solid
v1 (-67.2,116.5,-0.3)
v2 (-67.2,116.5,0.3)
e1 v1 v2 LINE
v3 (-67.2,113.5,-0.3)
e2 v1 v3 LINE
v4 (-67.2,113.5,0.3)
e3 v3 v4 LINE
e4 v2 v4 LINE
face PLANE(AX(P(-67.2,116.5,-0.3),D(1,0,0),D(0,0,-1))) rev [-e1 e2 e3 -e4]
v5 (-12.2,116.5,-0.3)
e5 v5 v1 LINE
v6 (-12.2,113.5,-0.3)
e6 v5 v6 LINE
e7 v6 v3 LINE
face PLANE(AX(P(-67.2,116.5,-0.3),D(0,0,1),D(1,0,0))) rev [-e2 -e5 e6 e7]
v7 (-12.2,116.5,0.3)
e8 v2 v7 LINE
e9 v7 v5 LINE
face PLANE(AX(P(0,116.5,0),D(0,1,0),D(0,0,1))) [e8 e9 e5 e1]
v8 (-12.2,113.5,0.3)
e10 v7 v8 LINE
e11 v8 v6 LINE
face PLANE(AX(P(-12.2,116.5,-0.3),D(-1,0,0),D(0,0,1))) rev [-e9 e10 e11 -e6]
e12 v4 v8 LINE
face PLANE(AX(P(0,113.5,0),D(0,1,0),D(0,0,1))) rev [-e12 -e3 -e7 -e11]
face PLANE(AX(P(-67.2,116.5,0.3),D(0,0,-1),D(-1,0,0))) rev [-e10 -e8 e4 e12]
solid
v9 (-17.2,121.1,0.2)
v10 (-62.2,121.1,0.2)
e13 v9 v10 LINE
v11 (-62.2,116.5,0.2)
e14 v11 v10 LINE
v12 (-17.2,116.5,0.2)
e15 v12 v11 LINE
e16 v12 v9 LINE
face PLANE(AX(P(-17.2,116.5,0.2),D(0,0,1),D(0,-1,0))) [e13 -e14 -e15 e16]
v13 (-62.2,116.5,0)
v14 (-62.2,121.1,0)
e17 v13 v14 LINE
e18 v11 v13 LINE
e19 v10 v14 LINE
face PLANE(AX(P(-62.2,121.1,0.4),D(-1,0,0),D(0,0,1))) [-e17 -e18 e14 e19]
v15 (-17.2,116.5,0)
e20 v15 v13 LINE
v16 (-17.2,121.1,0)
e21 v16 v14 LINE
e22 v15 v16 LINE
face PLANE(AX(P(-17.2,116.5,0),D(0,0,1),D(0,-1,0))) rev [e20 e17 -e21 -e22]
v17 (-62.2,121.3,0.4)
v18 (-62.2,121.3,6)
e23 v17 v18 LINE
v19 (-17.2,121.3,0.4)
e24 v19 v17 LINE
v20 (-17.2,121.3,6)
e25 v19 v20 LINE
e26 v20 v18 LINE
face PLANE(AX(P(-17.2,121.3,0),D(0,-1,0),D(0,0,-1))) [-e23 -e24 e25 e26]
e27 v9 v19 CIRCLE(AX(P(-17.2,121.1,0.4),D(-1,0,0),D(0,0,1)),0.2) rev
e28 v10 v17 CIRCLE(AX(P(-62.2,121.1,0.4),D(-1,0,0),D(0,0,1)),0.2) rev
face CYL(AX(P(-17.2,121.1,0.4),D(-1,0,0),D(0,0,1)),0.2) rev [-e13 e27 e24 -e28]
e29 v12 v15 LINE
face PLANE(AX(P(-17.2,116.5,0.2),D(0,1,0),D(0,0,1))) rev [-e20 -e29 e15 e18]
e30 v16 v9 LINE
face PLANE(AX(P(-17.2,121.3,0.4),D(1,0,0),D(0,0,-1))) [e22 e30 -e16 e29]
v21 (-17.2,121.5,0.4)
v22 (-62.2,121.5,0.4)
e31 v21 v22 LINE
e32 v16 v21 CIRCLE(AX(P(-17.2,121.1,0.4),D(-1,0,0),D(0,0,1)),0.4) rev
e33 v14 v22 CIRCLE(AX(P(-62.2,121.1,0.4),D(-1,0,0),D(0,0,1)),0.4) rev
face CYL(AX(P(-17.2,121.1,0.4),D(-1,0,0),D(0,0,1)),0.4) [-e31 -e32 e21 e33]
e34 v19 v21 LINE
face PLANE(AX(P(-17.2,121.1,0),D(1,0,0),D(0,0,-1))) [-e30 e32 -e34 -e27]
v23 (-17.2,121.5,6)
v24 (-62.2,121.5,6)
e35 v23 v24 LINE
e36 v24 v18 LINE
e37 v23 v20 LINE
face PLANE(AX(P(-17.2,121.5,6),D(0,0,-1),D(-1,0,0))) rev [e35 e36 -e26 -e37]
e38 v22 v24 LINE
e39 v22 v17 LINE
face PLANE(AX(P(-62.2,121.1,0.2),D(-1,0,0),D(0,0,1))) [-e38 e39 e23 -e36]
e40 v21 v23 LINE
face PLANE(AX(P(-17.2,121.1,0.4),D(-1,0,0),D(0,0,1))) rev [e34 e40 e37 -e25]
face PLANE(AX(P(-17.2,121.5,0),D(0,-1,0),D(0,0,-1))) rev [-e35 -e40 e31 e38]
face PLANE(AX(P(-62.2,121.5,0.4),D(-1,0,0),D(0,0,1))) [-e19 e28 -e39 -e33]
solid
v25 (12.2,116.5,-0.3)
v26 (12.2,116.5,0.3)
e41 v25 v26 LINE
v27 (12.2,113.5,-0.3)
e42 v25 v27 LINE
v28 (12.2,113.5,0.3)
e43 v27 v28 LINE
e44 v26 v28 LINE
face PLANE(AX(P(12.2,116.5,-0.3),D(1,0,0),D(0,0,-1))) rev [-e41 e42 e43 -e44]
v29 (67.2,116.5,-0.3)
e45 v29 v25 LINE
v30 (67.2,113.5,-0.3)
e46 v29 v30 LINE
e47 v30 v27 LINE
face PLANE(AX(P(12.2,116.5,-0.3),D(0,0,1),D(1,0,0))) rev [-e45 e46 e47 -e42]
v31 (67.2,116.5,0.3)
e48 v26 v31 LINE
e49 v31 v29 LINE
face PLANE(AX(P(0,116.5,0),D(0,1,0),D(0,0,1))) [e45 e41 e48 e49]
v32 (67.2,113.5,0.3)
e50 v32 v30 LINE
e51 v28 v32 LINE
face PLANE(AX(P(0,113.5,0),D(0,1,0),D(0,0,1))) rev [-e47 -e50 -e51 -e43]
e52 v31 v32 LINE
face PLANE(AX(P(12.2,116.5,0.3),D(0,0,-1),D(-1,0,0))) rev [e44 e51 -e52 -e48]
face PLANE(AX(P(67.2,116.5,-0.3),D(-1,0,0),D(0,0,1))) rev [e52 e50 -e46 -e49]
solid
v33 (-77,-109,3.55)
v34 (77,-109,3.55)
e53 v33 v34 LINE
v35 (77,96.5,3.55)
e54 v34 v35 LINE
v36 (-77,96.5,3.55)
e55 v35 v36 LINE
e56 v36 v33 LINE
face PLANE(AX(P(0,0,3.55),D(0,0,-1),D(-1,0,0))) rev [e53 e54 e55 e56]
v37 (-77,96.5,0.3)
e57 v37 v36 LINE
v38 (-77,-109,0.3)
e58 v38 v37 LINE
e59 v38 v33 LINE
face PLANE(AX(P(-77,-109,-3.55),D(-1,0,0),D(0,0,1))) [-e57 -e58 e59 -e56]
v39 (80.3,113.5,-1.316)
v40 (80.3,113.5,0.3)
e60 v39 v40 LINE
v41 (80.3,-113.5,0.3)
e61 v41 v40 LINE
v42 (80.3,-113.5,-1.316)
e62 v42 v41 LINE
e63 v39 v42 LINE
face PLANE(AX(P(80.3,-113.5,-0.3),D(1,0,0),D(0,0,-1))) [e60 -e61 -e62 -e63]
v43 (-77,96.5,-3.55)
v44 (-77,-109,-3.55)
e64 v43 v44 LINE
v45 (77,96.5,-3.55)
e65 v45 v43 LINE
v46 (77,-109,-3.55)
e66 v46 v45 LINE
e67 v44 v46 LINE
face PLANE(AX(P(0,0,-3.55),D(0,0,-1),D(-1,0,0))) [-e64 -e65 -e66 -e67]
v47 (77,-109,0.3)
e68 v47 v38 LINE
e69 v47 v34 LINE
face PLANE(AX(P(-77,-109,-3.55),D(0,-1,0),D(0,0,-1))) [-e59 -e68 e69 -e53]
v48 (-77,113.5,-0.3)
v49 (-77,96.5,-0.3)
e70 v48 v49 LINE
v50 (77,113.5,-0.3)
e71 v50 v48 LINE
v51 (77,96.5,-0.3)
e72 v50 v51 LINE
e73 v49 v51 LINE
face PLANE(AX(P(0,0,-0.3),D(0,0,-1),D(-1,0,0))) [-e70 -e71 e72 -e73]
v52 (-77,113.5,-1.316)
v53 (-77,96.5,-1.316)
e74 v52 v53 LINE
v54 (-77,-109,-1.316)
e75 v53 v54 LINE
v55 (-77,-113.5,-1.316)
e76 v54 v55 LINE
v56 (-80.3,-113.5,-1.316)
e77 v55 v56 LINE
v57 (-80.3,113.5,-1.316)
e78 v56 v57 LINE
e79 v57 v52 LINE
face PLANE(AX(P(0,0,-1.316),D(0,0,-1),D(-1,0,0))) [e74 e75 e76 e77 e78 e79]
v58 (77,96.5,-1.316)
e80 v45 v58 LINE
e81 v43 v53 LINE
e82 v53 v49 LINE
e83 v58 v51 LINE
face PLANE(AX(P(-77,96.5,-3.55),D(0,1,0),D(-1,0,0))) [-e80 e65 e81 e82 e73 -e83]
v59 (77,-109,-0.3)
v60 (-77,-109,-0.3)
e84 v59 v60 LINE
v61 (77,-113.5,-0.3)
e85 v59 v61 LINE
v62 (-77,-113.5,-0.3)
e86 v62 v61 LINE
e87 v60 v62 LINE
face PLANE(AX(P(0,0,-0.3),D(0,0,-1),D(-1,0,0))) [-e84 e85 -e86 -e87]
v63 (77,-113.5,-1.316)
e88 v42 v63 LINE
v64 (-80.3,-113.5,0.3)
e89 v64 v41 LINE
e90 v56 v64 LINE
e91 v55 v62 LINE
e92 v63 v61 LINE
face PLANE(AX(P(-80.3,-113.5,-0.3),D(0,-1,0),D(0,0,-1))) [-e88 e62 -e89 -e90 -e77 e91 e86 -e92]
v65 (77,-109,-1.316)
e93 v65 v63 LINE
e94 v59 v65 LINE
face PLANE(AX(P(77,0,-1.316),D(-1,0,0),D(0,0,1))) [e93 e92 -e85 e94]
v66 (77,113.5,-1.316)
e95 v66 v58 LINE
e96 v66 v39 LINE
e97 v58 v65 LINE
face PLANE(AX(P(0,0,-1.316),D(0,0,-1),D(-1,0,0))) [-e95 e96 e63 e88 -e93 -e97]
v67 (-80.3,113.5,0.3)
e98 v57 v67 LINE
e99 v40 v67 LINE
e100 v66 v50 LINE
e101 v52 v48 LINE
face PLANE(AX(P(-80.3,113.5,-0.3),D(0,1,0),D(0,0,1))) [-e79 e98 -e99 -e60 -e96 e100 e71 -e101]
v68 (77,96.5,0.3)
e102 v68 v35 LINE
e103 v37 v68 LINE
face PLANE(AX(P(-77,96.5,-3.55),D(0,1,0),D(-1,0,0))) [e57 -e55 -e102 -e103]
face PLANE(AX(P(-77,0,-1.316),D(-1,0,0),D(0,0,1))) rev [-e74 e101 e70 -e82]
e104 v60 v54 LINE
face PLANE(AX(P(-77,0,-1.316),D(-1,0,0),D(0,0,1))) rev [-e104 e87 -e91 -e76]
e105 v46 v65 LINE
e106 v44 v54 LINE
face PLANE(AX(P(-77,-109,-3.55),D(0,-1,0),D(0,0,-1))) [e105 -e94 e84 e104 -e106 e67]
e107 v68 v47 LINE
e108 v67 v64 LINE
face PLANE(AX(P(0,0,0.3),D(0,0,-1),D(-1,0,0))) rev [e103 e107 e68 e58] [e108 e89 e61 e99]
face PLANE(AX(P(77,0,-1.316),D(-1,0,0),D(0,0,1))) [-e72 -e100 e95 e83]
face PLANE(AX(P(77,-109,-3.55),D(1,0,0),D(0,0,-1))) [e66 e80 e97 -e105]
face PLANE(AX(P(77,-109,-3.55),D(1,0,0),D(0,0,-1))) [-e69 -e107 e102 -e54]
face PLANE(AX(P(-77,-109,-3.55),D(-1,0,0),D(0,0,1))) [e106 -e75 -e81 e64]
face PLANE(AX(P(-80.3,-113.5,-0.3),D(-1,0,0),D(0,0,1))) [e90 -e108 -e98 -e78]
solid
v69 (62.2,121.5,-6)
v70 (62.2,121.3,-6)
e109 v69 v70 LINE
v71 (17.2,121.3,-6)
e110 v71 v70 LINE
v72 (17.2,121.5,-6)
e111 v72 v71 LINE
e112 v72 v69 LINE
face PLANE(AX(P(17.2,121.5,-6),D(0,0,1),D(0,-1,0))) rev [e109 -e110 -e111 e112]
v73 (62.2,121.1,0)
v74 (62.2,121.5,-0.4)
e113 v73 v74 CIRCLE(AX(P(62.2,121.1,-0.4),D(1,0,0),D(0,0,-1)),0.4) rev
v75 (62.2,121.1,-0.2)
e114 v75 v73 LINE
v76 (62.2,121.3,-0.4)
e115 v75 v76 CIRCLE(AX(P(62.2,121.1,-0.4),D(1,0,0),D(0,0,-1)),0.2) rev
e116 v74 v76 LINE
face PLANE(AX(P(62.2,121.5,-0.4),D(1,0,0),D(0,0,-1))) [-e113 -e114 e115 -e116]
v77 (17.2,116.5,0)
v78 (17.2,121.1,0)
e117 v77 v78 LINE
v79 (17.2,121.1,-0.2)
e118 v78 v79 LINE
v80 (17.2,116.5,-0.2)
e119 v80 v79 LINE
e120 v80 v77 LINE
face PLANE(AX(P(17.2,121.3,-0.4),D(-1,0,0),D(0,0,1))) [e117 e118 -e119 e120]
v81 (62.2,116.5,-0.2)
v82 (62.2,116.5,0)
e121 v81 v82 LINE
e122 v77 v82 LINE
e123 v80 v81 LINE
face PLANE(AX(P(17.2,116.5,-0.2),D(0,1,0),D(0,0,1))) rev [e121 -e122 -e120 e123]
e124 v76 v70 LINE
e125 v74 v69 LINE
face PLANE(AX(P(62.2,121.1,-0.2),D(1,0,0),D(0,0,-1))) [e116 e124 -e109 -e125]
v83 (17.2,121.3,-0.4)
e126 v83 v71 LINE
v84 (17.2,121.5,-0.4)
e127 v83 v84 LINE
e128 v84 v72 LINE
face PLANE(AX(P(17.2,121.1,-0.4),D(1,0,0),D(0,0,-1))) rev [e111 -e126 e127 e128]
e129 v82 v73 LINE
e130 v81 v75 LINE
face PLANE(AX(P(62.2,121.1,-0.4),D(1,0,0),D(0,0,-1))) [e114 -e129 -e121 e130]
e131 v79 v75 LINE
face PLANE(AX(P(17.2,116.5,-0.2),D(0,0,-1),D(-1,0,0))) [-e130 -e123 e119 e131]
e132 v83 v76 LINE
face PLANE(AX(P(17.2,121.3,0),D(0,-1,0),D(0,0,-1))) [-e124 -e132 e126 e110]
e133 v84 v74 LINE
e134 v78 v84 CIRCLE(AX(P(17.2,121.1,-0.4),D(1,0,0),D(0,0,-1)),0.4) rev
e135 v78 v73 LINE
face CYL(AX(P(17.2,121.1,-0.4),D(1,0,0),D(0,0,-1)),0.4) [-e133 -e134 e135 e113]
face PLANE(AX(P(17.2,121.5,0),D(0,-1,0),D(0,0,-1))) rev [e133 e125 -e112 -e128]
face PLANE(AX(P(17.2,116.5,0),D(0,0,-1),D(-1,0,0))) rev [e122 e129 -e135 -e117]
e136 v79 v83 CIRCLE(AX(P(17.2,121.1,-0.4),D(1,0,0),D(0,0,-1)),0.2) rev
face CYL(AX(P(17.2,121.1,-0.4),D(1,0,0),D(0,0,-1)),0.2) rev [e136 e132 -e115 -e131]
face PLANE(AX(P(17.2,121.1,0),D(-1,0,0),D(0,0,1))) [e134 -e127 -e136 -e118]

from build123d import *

# Parameters (mm, degrees)
INSULATION_DEPTH      = 0.3
INSULATION_DEPTH_BACK = 0.3
SKETCH1_W             = 160.6
SKETCH1_H             = 227
MAIN_BODY_DEPTH       = 3.55
MAIN_BODY_DEPTH_BACK  = 3.55
SKETCH2_W             = 154
SKETCH2_H             = 205.5
SIDE_FOLDS_DEPTH      = 1.016
SKETCH114_W           = 55
SKETCH114_H           = 0.6
BOSS_EXTRUDE1_DEPTH   = 3
BOSS_EXTRUDE1_2_DEPTH = 3
BASE_FLANGE1_DEPTH    = 45
BASE_FLANGE2_DEPTH    = 45


# Sheet-metal steps are written as plain solids
with BuildPart() as part:
    # Sketch1 → Insulation (new, two sides: drawn at the far end of the back side and taken through both)
    with BuildSketch(Plane.XY.offset(-INSULATION_DEPTH_BACK)):
        Rectangle(SKETCH1_W, SKETCH1_H)
    extrude(amount=INSULATION_DEPTH + INSULATION_DEPTH_BACK)

    # Sketch2 → Main Body (add, two sides: drawn at the far end of the back side and taken through both)
    with BuildSketch(Plane.XY.offset(-MAIN_BODY_DEPTH_BACK)):
        with Locations((0, -6.25)):
            Rectangle(SKETCH2_W, SKETCH2_H)
    extrude(amount=MAIN_BODY_DEPTH + MAIN_BODY_DEPTH_BACK)

    # Sketch5 → Side Folds (add)
    with BuildSketch(Plane(origin=(0, 0, -0.3), x_dir=(-1, 0, 0), z_dir=(0, 0, -1))):
        Polygon((-77, -109), (-77, 96.5), (-77, 113.5), (-80.3, 113.5), (-80.3, -113.5), (-77, -113.5), align=None)
        Polygon((77, 113.5), (77, 96.5), (77, -109), (77, -113.5), (80.3, -113.5), (80.3, 113.5), align=None)
    extrude(amount=SIDE_FOLDS_DEPTH)


with BuildPart() as body_2:
    # Sketch114 → Boss-Extrude1 (new body)
    with BuildSketch(Plane(origin=(0, 113.5, 0), x_dir=(1, 0, 0), z_dir=(0, 1, 0))):
        with Locations((-39.7, 0)):
            Rectangle(SKETCH114_W, SKETCH114_H)
    extrude(amount=BOSS_EXTRUDE1_DEPTH)


with BuildPart() as body_3:
    # Sketch114 → Boss-Extrude1 2 (new body)
    with BuildSketch(Plane(origin=(0, 113.5, 0), x_dir=(1, 0, 0), z_dir=(0, 1, 0))):
        with Locations((39.7, 0)):
            Rectangle(SKETCH114_W, SKETCH114_H)
    extrude(amount=BOSS_EXTRUDE1_2_DEPTH)


with BuildPart() as body_4:
    # Sketch115 → Base-Flange1 (new body)
    with BuildSketch(Plane.ZY.offset(62.2)):
        with BuildLine():
            Line((0, 116.5), (0, 121.1))
            ThreePointArc((0, 121.1), (0.117157288, 121.382842712), (0.4, 121.5))
            Line((0.4, 121.5), (6, 121.5))
            Line((6, 121.5), (6, 121.3))
            Line((6, 121.3), (0.4, 121.3))
            ThreePointArc((0.4, 121.3), (0.258578644, 121.241421356), (0.2, 121.1))
            Line((0.2, 121.1), (0.2, 116.5))
            Line((0.2, 116.5), (0, 116.5))
        make_face()
    extrude(amount=-BASE_FLANGE1_DEPTH)


with BuildPart() as body_5:
    # Sketch120 → Base-Flange2 (new body)
    with BuildSketch(Plane(origin=(62.2, 0, 0), x_dir=(0, 0, -1), z_dir=(1, 0, 0))):
        with BuildLine():
            Line((0, 116.5), (0, 121.1))
            ThreePointArc((0, 121.1), (0.117157288, 121.382842712), (0.4, 121.5))
            Line((0.4, 121.5), (6, 121.5))
            Line((6, 121.5), (6, 121.3))
            Line((6, 121.3), (0.4, 121.3))
            ThreePointArc((0.4, 121.3), (0.258578644, 121.241421356), (0.2, 121.1))
            Line((0.2, 121.1), (0.2, 116.5))
            Line((0.2, 116.5), (0, 116.5))
        make_face()
    extrude(amount=-BASE_FLANGE2_DEPTH)


solid = Compound([part.part, body_2.part, body_3.part, body_4.part, body_5.part])
